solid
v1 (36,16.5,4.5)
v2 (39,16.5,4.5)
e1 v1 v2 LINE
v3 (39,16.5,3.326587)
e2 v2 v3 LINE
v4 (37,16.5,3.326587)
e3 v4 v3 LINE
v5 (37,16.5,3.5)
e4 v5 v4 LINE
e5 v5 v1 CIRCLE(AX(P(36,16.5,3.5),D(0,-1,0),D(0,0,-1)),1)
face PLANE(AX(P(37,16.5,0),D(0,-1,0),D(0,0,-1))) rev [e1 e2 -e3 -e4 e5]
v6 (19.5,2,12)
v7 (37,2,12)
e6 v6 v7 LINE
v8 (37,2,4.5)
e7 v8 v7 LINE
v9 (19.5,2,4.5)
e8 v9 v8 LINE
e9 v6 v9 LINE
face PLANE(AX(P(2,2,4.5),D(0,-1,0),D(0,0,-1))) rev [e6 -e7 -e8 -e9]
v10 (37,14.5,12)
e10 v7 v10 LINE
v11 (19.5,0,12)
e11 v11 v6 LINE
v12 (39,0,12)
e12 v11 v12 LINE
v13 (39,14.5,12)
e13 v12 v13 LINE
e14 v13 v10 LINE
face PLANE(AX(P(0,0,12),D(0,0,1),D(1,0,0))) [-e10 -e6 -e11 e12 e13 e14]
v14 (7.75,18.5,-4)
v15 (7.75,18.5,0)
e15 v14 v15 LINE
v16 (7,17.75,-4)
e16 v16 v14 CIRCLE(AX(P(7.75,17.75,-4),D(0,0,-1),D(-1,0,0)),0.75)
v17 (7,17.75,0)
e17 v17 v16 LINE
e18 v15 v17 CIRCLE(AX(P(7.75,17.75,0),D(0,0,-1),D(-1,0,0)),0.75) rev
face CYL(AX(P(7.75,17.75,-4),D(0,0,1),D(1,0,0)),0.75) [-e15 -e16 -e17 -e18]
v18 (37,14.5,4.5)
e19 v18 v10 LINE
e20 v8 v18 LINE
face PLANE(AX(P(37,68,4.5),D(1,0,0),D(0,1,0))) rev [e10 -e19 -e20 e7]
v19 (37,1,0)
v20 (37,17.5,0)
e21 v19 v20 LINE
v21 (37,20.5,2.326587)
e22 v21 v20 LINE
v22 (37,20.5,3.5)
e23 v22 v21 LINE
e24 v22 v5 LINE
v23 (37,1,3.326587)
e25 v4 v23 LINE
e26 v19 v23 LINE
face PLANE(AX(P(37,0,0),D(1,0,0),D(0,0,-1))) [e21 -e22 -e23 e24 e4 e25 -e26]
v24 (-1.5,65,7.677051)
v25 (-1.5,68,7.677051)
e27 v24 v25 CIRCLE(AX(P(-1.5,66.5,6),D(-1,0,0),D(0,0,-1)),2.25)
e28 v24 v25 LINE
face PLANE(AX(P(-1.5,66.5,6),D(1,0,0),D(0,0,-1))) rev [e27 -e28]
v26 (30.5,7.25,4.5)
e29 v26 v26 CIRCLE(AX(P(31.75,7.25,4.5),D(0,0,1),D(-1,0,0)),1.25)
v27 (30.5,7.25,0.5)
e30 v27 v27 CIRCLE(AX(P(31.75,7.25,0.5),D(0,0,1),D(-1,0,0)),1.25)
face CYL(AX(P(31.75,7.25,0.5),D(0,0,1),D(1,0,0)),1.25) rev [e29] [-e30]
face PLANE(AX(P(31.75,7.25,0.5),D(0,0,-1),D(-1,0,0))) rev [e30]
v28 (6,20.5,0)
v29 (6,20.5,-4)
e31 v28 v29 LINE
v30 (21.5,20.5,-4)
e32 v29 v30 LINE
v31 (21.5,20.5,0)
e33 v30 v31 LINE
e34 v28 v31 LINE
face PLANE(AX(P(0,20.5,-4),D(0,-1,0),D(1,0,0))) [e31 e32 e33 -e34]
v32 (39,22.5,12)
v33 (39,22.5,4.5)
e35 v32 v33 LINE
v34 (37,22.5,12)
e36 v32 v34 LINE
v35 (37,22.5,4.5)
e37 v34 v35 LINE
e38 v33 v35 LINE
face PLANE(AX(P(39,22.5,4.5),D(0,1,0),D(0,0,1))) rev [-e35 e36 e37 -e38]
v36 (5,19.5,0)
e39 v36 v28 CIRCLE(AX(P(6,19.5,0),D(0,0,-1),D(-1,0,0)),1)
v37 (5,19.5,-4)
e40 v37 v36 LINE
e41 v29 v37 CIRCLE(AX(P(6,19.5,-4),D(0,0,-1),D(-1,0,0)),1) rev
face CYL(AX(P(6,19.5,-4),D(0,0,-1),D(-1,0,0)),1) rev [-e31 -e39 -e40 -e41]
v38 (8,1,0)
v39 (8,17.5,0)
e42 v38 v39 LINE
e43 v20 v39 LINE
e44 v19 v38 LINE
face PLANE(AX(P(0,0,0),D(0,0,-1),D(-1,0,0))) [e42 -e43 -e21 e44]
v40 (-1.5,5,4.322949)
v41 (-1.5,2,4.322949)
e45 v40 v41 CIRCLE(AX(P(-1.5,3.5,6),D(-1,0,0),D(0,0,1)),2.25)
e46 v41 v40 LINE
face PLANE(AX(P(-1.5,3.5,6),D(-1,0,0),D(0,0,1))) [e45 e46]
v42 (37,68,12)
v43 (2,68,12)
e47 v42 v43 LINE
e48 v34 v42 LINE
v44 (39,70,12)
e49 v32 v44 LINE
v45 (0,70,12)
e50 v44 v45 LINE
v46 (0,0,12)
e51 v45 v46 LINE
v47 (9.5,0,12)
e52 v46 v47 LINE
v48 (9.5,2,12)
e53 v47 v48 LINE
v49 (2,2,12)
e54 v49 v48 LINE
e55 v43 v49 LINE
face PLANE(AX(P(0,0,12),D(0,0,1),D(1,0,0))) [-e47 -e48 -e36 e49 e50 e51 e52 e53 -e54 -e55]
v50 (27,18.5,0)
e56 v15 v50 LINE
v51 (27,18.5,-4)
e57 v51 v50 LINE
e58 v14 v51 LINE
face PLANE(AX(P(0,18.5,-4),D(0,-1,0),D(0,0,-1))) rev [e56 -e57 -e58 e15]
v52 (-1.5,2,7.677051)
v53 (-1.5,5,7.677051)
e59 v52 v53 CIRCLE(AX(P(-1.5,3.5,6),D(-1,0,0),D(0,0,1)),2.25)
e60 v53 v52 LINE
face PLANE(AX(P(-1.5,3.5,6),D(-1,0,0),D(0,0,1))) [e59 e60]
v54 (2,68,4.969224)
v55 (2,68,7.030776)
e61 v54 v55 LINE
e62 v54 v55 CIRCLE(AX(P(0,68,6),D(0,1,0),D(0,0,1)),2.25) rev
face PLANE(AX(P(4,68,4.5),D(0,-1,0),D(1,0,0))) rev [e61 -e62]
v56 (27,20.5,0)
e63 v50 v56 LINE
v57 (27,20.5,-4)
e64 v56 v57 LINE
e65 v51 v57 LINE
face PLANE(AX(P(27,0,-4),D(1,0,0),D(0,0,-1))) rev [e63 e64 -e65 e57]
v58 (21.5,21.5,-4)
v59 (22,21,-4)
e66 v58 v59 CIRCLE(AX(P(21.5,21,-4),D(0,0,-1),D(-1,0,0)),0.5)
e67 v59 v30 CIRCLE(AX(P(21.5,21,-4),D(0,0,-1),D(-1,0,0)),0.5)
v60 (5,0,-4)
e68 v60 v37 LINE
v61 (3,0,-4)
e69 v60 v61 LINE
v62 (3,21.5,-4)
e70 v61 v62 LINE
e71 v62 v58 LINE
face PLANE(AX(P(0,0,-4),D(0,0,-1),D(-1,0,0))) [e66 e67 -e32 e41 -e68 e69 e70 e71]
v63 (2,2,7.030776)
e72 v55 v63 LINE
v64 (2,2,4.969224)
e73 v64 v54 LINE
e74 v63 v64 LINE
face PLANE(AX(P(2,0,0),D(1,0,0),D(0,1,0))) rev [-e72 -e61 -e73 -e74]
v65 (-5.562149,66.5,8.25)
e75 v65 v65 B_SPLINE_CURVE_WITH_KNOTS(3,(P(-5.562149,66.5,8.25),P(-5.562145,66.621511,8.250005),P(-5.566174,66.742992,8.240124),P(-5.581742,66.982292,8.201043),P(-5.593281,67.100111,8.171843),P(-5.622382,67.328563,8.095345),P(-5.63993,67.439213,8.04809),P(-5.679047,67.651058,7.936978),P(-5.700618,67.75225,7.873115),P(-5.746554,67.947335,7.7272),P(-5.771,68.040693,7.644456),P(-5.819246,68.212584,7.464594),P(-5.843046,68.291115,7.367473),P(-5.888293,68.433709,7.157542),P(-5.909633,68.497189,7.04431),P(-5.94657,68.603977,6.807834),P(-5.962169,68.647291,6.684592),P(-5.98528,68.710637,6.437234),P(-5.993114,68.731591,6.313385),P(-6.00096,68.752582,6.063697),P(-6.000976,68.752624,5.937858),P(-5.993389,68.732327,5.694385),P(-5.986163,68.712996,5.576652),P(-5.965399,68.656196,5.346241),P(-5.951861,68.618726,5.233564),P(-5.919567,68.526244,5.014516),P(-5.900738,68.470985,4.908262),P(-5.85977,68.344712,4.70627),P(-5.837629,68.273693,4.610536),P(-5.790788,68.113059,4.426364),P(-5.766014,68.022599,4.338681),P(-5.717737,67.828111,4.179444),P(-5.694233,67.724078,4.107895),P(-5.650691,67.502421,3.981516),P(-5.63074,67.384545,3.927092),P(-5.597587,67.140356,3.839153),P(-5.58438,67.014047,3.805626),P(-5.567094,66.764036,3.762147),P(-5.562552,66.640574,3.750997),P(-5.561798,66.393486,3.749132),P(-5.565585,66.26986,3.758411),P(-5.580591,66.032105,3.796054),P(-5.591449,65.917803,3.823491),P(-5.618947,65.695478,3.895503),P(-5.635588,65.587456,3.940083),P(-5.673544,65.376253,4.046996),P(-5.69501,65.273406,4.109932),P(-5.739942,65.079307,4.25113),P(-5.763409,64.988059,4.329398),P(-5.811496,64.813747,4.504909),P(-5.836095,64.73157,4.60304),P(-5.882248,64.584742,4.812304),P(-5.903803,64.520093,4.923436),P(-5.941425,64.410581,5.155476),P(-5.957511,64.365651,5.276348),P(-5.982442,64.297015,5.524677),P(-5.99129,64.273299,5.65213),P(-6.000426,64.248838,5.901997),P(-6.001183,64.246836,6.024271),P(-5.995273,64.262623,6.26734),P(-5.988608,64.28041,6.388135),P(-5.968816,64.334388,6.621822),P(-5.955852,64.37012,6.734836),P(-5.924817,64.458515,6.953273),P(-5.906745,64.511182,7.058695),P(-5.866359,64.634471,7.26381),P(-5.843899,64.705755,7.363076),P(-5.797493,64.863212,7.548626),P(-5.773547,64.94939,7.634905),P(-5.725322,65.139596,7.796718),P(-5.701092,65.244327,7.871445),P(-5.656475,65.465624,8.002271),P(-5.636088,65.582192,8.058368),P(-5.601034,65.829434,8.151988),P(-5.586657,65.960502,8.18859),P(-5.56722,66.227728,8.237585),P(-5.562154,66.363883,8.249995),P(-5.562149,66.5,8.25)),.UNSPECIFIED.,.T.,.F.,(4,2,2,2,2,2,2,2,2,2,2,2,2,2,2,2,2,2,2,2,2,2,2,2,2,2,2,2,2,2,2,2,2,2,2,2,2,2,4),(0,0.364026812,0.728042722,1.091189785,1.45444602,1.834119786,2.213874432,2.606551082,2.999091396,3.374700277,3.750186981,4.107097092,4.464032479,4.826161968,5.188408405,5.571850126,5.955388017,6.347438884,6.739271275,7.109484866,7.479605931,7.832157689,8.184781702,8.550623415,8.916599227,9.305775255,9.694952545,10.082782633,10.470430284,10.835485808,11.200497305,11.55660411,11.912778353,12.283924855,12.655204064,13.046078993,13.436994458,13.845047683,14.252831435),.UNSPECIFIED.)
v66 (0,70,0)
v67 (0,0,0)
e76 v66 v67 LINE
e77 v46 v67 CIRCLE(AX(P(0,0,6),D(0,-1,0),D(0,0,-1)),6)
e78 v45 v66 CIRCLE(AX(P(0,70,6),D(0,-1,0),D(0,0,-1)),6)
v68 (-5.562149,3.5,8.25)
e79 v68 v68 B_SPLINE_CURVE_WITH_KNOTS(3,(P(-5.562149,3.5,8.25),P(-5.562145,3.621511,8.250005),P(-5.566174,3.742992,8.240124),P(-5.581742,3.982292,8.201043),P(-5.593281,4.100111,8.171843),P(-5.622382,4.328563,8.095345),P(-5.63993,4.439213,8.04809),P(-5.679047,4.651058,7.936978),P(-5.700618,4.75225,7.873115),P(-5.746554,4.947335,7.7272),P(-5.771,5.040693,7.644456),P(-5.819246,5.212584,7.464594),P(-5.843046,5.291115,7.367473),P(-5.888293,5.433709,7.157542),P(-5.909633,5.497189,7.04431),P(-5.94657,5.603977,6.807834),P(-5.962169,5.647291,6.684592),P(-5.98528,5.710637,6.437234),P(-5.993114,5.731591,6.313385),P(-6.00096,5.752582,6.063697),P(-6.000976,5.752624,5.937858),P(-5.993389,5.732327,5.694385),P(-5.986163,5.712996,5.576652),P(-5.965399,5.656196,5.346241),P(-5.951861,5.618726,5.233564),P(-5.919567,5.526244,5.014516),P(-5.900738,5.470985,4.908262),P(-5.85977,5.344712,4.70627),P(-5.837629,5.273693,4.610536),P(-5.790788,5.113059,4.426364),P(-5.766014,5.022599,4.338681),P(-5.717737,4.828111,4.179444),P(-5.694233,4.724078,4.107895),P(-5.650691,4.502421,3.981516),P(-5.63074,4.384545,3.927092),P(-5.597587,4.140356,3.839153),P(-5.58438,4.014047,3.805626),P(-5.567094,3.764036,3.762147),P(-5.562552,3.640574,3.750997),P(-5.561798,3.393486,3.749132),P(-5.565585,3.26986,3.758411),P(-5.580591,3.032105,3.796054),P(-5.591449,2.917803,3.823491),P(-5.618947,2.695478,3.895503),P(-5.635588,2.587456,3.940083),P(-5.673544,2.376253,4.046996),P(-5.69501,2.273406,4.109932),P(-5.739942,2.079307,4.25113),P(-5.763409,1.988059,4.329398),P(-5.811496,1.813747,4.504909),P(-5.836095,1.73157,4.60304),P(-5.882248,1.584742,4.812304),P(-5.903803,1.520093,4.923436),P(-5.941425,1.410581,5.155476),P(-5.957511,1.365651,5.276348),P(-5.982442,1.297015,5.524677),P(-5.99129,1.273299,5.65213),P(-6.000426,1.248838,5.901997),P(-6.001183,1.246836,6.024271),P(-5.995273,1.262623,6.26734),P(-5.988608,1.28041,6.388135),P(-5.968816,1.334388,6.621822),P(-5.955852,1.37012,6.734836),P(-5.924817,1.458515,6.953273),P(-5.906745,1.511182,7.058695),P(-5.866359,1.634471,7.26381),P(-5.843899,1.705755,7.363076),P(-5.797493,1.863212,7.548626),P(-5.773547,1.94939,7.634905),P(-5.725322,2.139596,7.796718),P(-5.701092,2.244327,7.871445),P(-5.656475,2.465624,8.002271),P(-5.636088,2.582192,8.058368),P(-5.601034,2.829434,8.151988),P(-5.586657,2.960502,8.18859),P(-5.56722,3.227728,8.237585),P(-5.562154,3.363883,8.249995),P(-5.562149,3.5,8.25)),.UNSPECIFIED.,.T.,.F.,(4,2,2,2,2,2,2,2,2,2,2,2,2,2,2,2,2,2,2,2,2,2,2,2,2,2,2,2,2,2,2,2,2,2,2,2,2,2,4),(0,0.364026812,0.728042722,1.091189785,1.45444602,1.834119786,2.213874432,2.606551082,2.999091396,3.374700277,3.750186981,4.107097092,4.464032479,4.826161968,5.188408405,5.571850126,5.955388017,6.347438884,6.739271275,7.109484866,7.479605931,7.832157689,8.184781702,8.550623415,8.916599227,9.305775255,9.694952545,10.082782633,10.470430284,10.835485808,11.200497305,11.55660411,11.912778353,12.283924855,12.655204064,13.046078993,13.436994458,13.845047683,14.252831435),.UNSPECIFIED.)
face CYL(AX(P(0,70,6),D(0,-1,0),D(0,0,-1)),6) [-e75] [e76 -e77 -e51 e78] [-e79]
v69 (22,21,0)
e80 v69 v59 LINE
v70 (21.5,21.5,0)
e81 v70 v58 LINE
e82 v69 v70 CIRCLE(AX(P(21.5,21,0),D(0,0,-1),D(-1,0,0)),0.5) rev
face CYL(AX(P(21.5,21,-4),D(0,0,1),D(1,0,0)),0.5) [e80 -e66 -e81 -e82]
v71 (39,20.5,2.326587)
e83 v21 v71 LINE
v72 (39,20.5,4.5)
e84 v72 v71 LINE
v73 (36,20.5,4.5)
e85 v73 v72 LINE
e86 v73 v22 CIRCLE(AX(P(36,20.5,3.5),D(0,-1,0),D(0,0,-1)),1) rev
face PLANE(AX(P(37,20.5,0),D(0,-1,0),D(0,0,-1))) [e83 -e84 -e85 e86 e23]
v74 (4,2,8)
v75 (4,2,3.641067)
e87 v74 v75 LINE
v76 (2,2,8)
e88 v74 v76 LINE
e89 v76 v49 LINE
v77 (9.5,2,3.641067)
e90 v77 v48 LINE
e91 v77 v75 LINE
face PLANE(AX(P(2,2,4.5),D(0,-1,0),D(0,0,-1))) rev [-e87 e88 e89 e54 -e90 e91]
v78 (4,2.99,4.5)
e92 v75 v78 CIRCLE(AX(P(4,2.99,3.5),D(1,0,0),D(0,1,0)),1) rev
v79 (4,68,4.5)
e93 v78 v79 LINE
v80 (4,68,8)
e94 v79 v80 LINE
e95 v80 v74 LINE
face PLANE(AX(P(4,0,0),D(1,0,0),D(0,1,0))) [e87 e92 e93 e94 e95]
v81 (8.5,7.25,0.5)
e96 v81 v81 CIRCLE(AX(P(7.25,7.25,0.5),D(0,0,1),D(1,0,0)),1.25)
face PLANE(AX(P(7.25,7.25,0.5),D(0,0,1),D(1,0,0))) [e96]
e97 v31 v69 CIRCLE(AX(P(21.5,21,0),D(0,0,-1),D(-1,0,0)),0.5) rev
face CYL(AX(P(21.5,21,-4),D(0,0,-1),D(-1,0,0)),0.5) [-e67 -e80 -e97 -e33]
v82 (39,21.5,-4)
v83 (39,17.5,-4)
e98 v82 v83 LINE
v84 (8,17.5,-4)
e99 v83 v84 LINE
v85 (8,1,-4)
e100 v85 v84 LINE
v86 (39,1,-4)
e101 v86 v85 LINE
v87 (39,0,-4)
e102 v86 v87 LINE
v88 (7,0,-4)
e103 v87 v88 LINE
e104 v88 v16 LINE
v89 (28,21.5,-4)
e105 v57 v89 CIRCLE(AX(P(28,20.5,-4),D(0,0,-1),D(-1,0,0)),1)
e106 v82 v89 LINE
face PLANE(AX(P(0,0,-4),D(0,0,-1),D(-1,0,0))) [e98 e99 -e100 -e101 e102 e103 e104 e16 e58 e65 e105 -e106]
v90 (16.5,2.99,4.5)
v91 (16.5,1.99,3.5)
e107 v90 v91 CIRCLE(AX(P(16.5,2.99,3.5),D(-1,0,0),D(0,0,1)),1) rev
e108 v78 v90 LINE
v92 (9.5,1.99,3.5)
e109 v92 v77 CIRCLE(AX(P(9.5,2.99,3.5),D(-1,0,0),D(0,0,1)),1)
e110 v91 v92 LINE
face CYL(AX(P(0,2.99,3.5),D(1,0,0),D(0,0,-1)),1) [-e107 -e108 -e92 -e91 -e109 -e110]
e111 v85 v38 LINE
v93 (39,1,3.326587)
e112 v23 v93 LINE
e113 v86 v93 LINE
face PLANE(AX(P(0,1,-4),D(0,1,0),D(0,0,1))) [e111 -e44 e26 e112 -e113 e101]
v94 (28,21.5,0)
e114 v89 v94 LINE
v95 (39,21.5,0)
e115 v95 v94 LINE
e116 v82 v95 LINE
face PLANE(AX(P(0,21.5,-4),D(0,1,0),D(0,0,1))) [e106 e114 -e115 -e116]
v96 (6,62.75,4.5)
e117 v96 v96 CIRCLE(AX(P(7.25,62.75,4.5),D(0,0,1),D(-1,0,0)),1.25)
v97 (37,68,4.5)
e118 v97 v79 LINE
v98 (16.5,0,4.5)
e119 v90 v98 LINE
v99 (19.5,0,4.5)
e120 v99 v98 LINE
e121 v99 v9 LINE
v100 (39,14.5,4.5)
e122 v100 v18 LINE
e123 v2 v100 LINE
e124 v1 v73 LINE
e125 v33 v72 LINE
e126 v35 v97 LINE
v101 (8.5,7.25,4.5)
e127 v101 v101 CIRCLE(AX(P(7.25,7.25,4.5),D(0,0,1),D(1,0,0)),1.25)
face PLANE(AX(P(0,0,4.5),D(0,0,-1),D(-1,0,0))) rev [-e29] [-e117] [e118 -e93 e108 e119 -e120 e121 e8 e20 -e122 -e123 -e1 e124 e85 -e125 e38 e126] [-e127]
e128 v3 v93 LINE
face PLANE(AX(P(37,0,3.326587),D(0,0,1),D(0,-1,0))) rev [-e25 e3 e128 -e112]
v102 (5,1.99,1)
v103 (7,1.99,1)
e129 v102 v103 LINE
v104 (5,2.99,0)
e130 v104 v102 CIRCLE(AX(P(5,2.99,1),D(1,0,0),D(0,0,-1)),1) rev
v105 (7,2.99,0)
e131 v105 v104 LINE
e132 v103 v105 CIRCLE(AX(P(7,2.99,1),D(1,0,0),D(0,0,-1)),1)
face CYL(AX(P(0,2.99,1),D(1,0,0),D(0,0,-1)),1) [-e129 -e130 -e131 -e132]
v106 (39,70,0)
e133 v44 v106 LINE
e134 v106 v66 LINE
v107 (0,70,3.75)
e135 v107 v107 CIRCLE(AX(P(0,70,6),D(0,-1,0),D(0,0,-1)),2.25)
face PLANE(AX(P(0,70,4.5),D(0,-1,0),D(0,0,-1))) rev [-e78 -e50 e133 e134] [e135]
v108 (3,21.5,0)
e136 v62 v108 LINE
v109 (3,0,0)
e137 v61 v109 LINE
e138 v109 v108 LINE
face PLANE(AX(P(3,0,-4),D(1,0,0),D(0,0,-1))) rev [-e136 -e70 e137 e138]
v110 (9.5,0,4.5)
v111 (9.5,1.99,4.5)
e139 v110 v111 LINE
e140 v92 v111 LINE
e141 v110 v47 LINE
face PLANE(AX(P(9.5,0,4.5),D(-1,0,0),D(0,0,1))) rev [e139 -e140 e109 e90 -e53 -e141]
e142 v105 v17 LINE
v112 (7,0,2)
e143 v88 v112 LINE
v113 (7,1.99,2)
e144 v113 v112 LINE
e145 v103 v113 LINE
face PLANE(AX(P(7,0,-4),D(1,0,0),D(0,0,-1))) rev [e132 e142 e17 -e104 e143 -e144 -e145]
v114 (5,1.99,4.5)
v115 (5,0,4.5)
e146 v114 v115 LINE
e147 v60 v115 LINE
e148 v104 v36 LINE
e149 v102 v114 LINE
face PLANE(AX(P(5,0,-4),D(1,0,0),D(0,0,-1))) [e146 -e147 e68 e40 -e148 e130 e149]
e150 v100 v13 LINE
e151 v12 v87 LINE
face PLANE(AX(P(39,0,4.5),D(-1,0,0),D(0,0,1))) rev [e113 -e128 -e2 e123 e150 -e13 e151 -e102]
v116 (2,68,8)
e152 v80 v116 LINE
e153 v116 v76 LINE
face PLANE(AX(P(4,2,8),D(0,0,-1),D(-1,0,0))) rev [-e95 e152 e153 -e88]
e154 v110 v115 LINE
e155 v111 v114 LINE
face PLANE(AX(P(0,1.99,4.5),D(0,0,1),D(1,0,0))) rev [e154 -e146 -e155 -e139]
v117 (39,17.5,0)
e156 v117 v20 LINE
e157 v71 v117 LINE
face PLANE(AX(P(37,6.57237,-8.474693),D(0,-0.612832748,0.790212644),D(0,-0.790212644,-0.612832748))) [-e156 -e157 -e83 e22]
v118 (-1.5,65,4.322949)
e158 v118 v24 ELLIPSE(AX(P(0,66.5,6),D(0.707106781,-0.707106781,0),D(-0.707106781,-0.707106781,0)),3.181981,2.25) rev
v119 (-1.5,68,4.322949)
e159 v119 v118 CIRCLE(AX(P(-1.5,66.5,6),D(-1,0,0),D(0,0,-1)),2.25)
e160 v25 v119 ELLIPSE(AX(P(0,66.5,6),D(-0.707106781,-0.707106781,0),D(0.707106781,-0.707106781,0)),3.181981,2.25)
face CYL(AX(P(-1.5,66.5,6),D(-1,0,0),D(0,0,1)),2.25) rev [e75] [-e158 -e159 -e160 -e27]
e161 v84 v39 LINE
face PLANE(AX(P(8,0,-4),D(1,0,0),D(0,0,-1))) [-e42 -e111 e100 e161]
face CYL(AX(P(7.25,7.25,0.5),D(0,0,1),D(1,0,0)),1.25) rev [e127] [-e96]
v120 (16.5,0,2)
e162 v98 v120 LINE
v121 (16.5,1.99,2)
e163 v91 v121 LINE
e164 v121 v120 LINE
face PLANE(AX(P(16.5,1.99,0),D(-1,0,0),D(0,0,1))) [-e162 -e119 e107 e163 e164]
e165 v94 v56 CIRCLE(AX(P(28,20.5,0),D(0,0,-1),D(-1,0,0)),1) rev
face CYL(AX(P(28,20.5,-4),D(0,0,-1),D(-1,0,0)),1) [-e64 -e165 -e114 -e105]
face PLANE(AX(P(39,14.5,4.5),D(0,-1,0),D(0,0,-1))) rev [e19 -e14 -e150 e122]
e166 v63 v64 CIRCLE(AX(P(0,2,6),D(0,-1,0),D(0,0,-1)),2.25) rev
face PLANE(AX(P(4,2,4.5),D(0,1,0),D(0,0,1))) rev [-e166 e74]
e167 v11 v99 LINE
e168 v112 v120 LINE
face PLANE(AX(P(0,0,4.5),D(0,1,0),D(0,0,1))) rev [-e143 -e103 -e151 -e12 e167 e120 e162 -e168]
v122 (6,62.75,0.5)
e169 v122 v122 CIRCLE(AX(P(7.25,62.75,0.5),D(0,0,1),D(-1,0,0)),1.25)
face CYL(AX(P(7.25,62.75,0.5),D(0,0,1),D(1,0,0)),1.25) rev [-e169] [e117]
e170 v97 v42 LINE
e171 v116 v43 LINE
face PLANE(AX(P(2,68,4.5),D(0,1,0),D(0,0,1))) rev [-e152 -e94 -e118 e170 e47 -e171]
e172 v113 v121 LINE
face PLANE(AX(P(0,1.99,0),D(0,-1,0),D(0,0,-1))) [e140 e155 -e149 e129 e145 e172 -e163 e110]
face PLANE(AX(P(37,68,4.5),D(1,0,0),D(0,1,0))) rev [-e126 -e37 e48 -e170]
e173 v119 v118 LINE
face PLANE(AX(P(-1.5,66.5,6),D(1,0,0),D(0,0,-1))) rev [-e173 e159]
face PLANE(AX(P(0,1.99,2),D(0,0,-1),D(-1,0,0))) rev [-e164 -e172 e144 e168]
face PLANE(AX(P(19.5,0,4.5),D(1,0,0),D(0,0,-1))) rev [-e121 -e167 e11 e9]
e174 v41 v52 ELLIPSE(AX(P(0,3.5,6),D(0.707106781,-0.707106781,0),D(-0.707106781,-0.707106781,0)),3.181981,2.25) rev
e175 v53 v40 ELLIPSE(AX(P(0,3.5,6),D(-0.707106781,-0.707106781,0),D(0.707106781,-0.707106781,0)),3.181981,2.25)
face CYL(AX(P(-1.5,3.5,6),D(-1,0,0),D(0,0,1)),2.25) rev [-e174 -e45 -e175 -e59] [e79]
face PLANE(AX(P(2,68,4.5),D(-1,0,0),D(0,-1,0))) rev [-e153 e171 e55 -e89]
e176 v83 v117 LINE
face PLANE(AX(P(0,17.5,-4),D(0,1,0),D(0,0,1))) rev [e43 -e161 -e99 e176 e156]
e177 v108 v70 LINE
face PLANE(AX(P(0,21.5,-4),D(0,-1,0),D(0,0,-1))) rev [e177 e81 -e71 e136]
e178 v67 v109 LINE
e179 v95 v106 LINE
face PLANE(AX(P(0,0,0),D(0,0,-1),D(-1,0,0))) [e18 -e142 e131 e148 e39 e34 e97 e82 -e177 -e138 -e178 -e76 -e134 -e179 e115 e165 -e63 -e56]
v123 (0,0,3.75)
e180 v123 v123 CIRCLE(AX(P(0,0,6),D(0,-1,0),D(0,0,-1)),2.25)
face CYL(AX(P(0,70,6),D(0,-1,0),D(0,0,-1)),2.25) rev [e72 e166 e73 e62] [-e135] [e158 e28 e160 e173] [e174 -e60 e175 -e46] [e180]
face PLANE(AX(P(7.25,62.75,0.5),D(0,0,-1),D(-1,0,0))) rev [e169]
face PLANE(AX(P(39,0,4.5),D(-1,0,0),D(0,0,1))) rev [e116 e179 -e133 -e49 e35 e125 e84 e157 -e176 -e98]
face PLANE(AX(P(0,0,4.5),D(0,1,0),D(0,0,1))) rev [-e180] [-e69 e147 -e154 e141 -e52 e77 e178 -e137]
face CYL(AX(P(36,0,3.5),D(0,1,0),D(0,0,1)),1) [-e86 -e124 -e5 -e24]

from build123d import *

# Parameters (mm, degrees)
SKETCH1_W                = 39
SKETCH1_H                = 70
BASE_DEPTH               = 4.5
SKETCH2_W                = 4
SKETCH2_H                = 62
WALLS_DEPTH              = 7.5
SKETCH3_W                = 10
SKETCH3_H                = 7.5
PWR_CONNECTOR_HOLE_DEPTH = 4
SKETCH4_W                = 7.5
SKETCH4_H                = 8
GPS_CONNECTOR_HOLE_DEPTH = 4
SKETCH5_R                = 1.25
MOUNTING_HOLES_DEPTH     = 4
GPS_MOUNT_DEPTH          = 4
SKETCH11_W               = 17
SKETCH11_H               = 1
SKETCH11_W_2             = 12
SKETCH11_H_2             = 3
PWR_CABLE_HOLDER1_DEPTH  = 4
PWR_FILLET2_R            = 1
PWR_FILLET3_R            = 0.5
SKETCH15_R               = 6
BALLON_MOUNT_DEPTH       = 70
SKETCH16_R               = 2.25
BALLOON_MOUNT_HOLE_DEPTH = 70
SKETCH21_R               = 2.25
SAFETY_MOUNT_DEPTH       = 4.5
SKETCH22_W               = 35
SKETCH22_H               = 66
LID_HOLE_DEPTH           = 7.5
SKETCH25_W               = 3.5
SKETCH25_H               = 66
CORRECTION_DEPTH         = 2
FILLET4_R                = 0.75
FILLET5_R                = 1
SKETCH12_W               = 7
SKETCH12_H               = 2.5
SKETCH12_W_2             = 2
SKETCH12_H_2             = 2
CUT_EXTRUDE2_DEPTH       = 1.99
SKETCH13_W               = 2.326586719
SKETCH13_H               = 10
CUT_EXTRUDE3_DEPTH       = 2
FILLET6_R                = 1
FILLET7_R                = 1
FILLET8_START            = 4
FILLET8_DEPTH            = 12.5
FILLET8_START_2          = 9.5
FILLET8_2_DEPTH          = 7


with BuildPart() as part:
    # Sketch1 → Base (new body)
    with BuildSketch(Plane.XY):
        with Locations((19.5, 35)):
            Rectangle(SKETCH1_W, SKETCH1_H)
    extrude(amount=BASE_DEPTH)

    # Sketch2 → Walls (add)
    with BuildSketch(Plane.XY.offset(4.5)):
        Polygon((39, 66), (39, 70), (0, 70), (0, 66), (4, 66), (35, 66), align=None)
        with Locations((37, 35)):
            Rectangle(SKETCH2_W, SKETCH2_H)
        Polygon((4, 66), (0, 66), (0, 0), (4, 0), (4, 4), align=None)
        Polygon((39, 0), (39, 4), (35, 4), (4, 4), (4, 0), align=None)
    extrude(amount=WALLS_DEPTH)

    # Sketch3 → PWR connector hole (cut)
    with BuildSketch(Plane(origin=(0, 4, 0), x_dir=(1, 0, 0), z_dir=(0, 1, 0))):
        with Locations((14.5, -8.25)):
            Rectangle(SKETCH3_W, SKETCH3_H)
    extrude(amount=-PWR_CONNECTOR_HOLE_DEPTH, mode=Mode.SUBTRACT)

    # Sketch4 → GPS connector hole (cut)
    with BuildSketch(Plane.ZY.offset(-35)):
        with Locations((8.25, 18.5)):
            Rectangle(SKETCH4_W, SKETCH4_H)
    extrude(amount=-GPS_CONNECTOR_HOLE_DEPTH, mode=Mode.SUBTRACT)

    # Sketch5 → Mounting holes (cut)
    with BuildSketch(Plane.XY.offset(4.5)):
        with Locations((7.25, 7.25)):
            Circle(SKETCH5_R)
        with Locations(Location((31.75, 7.25, 0), (0, 0, 180))):
            Circle(SKETCH5_R)
        with Locations(Location((7.25, 62.75, 0), (0, 0, 180))):
            Circle(SKETCH5_R)
    extrude(amount=-MOUNTING_HOLES_DEPTH, mode=Mode.SUBTRACT)

    # Sketch7 → GPS mount (add)
    with BuildSketch(Plane(origin=(0, 0, 0), x_dir=(-1, 0, 0), z_dir=(0, 0, -1))):
        Polygon((-39, 1), (-39, 0), (-7, 0), (-7, 18.5), (-39, 18.5), (-39, 17.5), (-8, 17.5), (-8, 1), align=None)
    extrude(amount=GPS_MOUNT_DEPTH)

    # Sketch11 → PWR cable holder1 (add)
    with BuildSketch(Plane(origin=(0, 0, 0), x_dir=(-1, 0, 0), z_dir=(0, 0, -1))):
        Polygon((-5, 0), (-3, 0), (-3, 21.5), (-5, 21.5), (-5, 20.5), align=None)
        with Locations((-13.5, 21)):
            Rectangle(SKETCH11_W, SKETCH11_H)
        with Locations((-33, 20)):
            Rectangle(SKETCH11_W_2, SKETCH11_H_2)
    extrude(amount=PWR_CABLE_HOLDER1_DEPTH)

    # PWR fillet2
    pwr_fillet2_edges = [part.edges().sort_by_distance(p)[0] for p in [
        (27, 21.5, -2),
    ]]
    fillet(pwr_fillet2_edges, radius=PWR_FILLET2_R)

    # PWR fillet3
    pwr_fillet3_edges = [part.edges().sort_by_distance(p)[0] for p in [
        (22, 21.5, -2),
        (22, 20.5, -2),
    ]]
    fillet(pwr_fillet3_edges, radius=PWR_FILLET3_R - 0.0001)  # a hair under: the kernel refuses the full size

    # Sketch15 → Ballon mount (add)
    with BuildSketch(Plane.XZ):
        with Locations((0, 6)):
            Circle(SKETCH15_R)
    extrude(amount=-BALLON_MOUNT_DEPTH)

    # Sketch16 → Balloon mount hole (cut)
    with BuildSketch(Plane.XZ):
        with Locations(Location((0, 6, 0), (0, 0, 270))):
            Circle(SKETCH16_R)
    extrude(amount=-BALLOON_MOUNT_HOLE_DEPTH, mode=Mode.SUBTRACT)

    # Sketch21 → Safety mount (cut)
    with BuildSketch(Plane.ZY.offset(6)):
        with Locations((6, 3.5)):
            Circle(SKETCH21_R)
        with Locations((6, 66.5)):
            Circle(SKETCH21_R)
    extrude(amount=-SAFETY_MOUNT_DEPTH, mode=Mode.SUBTRACT)

    # Sketch22 → Lid hole (cut)
    with BuildSketch(Plane.XY.offset(12)):
        with Locations((19.5, 35)):
            Rectangle(SKETCH22_W, SKETCH22_H)
    extrude(amount=-LID_HOLE_DEPTH, mode=Mode.SUBTRACT)

    # Sketch25 → Correction (add)
    with BuildSketch(Plane(origin=(2, 0, 0), x_dir=(0, 0, -1), z_dir=(1, 0, 0))):
        with Locations((-6.25, 35)):
            Rectangle(SKETCH25_W, SKETCH25_H)
    extrude(amount=CORRECTION_DEPTH)

    # Fillet4
    fillet4_edges = [part.edges().sort_by_distance(p)[0] for p in [
        (7, 18.5, -2),
    ]]
    fillet(fillet4_edges, radius=FILLET4_R)

    # Fillet5
    fillet5_edges = [part.edges().sort_by_distance(p)[0] for p in [
        (5, 20.5, -2),
    ]]
    fillet(fillet5_edges, radius=FILLET5_R)

    # Sketch12 → Cut-Extrude2 (cut)
    with BuildSketch(Plane.XZ):
        with Locations((13, 3.25)):
            Rectangle(SKETCH12_W, SKETCH12_H)
        Polygon((5, 4.5), (5, 2), (7, 2), (9.5, 2), (9.5, 4.5), align=None)
        with Locations((6, 1)):
            Rectangle(SKETCH12_W_2, SKETCH12_H_2)
    extrude(amount=-CUT_EXTRUDE2_DEPTH, mode=Mode.SUBTRACT)

    # Sketch13 → Cut-Extrude3 (cut)
    with BuildSketch(Plane(origin=(39, 0, 0), x_dir=(0, 0, -1), z_dir=(1, 0, 0))):
        Polygon((-2.326586719, 20.5), (-4.5, 20.5), (-4.5, 16.5), (-3.326586719, 16.5), (-2.326586719, 16.5), (-2.326586719, 17.5), align=None)
        Polygon((0, 17.5), (-2.326586719, 20.5), (-2.326586719, 17.5), align=None)
        Polygon((0, 17.5), (-2.326586719, 17.5), (-2.326586719, 16.5), (-2.326586719, 11), (0, 11), align=None)
        Polygon((-2.326586719, 16.5), (-3.326586719, 16.5), (-3.326586719, 1), (-2.326586719, 1), (-2.326586719, 11), align=None)
        with Locations((-1.16329336, 6)):
            Rectangle(SKETCH13_W, SKETCH13_H)
    extrude(amount=-CUT_EXTRUDE3_DEPTH, mode=Mode.SUBTRACT)

    # Fillet6
    fillet6_edges = [part.edges().sort_by_distance(p)[0] for p in [
        (37, 18.5, 4.5),
    ]]
    fillet(fillet6_edges, radius=FILLET6_R)

    # Fillet7
    fillet7_edges = [part.edges().sort_by_distance(p)[0] for p in [
        (6, 1.99, 0),
    ]]
    fillet(fillet7_edges, radius=FILLET7_R)

    # Fillet8: read off the stored shape, not the designer's step
    # Fillet8 outline → Fillet8 (cut)
    with BuildSketch(Plane.YZ.offset(FILLET8_START)):
        with BuildLine():
            Line((2.99, 4.5), (2, 4.5))
            Line((2, 4.5), (2, 3.64106736))
            ThreePointArc((2, 3.64106736), (2.334663201, 4.255336799), (2.99, 4.5))
        make_face()
    extrude(amount=FILLET8_DEPTH, mode=Mode.SUBTRACT)

    # Fillet8 2 outline → Fillet8 2 (cut)
    with BuildSketch(Plane.YZ.offset(FILLET8_START_2)):
        with BuildLine():
            Line((2, 3.64106736), (2, 4.5))
            Line((2, 4.5), (1.99, 4.5))
            Line((1.99, 4.5), (1.99, 3.5))
            ThreePointArc((1.99, 3.5), (1.992503133, 3.570710678), (2, 3.64106736))
        make_face()
    extrude(amount=FILLET8_2_DEPTH, mode=Mode.SUBTRACT)


solid = part.part
